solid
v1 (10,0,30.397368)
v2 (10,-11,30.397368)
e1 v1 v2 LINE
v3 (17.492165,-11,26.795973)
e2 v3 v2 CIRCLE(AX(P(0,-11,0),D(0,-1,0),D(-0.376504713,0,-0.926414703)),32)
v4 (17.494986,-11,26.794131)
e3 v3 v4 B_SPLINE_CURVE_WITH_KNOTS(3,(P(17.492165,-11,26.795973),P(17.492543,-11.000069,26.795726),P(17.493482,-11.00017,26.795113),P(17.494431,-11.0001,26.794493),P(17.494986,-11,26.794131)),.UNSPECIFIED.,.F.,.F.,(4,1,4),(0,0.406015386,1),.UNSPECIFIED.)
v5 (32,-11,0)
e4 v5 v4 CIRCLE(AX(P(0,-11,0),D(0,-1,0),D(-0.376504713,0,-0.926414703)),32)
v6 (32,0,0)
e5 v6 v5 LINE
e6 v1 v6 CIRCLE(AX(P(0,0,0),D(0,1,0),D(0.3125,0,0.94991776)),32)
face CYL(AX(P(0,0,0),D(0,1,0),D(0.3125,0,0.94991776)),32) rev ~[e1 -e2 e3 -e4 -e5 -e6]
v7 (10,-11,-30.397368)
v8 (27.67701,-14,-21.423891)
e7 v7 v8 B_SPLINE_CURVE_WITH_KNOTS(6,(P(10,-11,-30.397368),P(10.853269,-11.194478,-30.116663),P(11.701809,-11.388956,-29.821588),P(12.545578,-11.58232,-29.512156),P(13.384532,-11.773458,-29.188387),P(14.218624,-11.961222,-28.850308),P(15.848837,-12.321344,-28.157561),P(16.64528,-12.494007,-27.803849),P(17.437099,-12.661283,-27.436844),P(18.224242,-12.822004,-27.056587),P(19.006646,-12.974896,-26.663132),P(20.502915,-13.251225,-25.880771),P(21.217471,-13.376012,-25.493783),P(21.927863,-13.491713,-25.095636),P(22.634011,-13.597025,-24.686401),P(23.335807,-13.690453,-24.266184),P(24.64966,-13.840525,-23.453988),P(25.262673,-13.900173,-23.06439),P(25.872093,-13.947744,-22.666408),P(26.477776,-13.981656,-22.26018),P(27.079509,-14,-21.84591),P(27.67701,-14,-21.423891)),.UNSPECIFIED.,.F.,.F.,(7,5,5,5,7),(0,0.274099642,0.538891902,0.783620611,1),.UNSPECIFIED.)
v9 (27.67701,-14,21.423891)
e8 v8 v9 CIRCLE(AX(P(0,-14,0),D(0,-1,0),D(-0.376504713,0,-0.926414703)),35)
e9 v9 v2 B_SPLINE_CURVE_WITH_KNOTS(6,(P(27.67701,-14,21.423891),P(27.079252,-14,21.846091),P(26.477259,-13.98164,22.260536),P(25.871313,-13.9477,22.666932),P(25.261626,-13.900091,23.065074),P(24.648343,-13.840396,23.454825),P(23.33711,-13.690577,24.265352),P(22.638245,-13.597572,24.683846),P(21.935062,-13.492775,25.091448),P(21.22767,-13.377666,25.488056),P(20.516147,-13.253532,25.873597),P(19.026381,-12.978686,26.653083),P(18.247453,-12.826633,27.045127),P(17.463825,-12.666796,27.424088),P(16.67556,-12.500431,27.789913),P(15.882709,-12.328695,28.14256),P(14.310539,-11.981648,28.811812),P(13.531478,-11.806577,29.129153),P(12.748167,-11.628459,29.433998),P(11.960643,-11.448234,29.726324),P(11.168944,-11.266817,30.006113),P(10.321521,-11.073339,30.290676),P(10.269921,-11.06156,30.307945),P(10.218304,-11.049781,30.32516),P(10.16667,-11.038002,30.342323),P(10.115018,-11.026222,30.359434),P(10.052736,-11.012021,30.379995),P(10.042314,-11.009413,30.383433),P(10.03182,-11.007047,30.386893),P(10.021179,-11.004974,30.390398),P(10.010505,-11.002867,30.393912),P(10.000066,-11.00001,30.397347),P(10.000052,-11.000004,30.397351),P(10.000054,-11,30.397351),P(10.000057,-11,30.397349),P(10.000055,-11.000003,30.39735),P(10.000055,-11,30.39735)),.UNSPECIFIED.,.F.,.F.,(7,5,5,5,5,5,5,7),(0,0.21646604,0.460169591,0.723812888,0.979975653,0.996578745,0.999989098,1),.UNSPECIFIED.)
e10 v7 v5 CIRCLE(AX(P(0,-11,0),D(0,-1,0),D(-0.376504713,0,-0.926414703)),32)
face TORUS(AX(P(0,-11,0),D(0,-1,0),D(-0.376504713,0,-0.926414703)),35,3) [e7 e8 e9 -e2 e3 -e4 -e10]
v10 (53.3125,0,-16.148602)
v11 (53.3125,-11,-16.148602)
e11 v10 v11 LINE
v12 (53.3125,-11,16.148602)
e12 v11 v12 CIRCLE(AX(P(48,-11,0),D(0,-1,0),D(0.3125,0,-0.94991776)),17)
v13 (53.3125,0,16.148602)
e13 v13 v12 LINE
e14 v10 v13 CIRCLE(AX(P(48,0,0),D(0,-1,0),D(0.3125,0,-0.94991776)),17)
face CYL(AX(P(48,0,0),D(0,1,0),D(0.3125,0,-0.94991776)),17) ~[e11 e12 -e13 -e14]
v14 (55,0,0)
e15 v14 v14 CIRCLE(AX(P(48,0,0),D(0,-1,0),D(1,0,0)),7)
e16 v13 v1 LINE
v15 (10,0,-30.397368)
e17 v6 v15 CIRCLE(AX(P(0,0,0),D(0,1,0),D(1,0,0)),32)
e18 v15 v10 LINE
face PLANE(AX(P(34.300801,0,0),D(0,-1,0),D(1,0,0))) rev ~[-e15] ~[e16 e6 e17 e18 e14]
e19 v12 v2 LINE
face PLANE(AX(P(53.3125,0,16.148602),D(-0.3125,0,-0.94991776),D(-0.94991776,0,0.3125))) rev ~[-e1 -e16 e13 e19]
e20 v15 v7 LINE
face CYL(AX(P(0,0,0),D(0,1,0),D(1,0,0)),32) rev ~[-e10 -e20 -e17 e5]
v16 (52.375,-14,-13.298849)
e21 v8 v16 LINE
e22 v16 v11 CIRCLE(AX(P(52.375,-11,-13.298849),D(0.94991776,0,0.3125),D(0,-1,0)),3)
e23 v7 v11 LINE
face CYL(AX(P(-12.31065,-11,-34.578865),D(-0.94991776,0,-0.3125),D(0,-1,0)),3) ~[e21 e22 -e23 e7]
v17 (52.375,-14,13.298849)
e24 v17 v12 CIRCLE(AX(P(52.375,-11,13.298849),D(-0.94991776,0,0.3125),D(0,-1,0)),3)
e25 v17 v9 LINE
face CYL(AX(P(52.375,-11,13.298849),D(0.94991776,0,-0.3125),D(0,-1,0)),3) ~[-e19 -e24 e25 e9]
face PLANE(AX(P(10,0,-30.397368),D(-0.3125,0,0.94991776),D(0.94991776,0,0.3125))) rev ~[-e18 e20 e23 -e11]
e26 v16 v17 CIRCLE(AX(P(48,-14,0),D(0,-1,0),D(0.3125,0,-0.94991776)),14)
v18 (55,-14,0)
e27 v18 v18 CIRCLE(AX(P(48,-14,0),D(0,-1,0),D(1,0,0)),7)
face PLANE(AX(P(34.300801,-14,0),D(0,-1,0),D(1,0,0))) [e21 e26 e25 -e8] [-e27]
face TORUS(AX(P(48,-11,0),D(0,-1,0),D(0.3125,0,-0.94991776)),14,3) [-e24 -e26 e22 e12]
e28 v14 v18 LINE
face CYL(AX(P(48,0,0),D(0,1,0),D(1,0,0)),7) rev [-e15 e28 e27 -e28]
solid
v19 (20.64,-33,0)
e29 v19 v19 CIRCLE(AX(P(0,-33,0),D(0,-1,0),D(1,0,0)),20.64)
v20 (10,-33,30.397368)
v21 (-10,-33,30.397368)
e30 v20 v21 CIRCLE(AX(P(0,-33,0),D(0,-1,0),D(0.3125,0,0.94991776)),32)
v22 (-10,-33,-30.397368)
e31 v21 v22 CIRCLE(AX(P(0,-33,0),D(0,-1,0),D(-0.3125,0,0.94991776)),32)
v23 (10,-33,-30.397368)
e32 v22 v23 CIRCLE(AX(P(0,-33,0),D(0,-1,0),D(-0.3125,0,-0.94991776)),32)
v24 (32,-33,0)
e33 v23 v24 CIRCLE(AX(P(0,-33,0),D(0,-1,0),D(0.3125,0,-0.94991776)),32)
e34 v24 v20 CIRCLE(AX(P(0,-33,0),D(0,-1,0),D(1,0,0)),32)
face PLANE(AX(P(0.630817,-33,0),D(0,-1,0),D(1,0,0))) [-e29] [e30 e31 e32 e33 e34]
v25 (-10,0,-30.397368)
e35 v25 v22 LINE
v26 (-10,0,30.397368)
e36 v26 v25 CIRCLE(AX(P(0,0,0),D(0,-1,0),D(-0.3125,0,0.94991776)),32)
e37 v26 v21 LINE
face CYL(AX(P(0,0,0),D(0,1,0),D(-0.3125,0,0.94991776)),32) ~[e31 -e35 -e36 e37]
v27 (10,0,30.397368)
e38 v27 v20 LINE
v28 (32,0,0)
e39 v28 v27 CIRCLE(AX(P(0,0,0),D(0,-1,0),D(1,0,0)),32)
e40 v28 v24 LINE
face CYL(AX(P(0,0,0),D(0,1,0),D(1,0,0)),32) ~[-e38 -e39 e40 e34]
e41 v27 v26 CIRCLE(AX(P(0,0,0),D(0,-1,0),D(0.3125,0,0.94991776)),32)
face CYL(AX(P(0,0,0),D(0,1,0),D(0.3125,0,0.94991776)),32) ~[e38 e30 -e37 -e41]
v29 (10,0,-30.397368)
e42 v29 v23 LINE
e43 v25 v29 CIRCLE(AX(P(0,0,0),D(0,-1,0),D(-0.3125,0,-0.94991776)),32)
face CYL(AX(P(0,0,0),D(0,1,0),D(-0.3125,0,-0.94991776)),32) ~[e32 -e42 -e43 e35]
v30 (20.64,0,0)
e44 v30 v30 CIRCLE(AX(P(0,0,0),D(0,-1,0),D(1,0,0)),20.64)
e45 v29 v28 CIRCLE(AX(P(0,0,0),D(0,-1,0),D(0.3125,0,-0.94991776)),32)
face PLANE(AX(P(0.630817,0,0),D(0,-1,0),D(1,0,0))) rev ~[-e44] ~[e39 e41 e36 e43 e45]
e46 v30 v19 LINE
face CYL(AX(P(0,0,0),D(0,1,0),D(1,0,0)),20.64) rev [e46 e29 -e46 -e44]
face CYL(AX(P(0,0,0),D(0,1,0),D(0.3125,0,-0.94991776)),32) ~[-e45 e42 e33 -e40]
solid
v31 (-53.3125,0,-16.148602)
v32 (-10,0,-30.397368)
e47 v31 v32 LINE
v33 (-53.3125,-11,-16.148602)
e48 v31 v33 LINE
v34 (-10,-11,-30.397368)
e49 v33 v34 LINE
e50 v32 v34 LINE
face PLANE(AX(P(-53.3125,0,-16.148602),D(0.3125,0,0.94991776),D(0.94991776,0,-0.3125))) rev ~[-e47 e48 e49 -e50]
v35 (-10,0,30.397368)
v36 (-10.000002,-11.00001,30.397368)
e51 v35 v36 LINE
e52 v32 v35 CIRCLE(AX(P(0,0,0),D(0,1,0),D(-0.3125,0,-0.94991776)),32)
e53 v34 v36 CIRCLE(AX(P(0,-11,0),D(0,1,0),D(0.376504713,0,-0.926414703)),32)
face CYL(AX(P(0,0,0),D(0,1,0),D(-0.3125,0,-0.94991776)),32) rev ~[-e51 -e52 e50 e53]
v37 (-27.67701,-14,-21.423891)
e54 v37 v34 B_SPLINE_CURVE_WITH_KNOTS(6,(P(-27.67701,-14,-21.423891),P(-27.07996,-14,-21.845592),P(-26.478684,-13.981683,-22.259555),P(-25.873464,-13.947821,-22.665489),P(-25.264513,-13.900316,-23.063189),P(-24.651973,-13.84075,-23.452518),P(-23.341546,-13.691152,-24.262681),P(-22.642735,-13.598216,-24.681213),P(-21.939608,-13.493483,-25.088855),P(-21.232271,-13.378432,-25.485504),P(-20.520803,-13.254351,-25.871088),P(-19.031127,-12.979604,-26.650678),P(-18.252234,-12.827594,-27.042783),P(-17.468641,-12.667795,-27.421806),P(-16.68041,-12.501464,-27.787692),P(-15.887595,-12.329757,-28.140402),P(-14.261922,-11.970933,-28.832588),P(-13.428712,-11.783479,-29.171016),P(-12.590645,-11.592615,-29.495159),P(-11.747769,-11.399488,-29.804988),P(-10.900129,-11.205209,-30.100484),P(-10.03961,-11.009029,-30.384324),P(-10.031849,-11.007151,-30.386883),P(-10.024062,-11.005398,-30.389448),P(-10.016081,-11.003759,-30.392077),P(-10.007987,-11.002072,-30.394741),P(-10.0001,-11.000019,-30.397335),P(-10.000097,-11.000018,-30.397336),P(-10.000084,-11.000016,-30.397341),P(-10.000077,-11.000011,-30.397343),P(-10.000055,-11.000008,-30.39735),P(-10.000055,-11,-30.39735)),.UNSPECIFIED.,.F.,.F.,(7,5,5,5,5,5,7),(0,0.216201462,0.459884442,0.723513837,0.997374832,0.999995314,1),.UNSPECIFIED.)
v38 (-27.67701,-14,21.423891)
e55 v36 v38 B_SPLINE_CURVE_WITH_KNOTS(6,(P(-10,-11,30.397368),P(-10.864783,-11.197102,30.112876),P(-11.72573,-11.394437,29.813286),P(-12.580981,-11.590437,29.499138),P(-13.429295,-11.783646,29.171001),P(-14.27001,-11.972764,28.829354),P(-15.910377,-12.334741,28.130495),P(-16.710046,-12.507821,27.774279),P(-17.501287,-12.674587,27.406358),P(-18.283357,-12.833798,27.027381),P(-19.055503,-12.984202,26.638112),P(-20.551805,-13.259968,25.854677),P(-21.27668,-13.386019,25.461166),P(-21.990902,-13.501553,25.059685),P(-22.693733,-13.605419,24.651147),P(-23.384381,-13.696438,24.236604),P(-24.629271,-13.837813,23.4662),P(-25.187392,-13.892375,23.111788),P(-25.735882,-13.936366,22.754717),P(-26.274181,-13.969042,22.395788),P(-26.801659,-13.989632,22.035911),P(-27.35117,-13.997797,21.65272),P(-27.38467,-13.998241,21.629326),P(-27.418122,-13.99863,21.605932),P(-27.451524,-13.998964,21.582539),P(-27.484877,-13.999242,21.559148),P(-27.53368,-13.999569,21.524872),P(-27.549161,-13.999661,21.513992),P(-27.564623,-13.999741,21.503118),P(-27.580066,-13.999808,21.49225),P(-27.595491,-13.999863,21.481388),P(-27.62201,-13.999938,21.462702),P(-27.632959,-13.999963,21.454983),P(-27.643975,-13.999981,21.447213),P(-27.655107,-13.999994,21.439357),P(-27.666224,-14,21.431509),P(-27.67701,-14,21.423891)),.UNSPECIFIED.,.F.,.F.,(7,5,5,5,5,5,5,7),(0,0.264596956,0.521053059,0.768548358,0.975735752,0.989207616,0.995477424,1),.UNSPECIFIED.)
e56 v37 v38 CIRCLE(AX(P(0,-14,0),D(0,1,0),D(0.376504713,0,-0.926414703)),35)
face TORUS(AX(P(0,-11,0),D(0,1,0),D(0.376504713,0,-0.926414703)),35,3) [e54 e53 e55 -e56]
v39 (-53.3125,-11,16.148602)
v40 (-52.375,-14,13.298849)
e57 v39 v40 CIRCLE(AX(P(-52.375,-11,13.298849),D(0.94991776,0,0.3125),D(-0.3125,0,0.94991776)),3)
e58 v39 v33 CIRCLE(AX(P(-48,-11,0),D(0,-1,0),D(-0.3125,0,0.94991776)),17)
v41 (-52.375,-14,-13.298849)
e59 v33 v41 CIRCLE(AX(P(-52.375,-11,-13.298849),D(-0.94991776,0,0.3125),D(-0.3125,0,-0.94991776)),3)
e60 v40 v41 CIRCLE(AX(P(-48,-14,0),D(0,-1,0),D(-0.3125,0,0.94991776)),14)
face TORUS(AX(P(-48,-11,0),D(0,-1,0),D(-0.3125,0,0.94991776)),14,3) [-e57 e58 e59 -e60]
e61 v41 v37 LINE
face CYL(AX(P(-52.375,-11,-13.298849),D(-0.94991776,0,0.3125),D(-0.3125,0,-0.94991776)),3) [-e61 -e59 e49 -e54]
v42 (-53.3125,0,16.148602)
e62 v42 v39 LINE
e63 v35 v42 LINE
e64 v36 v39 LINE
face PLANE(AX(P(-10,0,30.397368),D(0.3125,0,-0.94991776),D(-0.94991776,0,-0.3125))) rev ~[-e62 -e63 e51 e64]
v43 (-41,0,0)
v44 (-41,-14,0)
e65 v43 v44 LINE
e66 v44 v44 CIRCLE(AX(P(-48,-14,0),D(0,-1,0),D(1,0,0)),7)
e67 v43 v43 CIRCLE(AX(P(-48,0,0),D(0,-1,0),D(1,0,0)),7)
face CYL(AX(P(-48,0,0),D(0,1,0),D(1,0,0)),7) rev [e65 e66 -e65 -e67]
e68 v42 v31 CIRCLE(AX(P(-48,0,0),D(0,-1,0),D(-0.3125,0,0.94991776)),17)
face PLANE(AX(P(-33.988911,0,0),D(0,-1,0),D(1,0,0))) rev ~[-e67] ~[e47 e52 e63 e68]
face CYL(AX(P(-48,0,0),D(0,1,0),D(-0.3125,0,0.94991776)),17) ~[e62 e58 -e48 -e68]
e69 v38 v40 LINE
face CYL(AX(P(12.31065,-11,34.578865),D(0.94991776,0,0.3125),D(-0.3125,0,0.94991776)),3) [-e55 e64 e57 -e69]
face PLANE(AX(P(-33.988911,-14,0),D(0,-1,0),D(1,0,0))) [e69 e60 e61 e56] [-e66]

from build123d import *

# Parameters (mm, degrees)
F0_R          = 7
F1_DEPTH      = 14
F0_R_2        = 20.64
F2_DEPTH      = 33
F3_T1_DEPTH   = 68.0960524607
F3_T3_DEPTH   = 68.0960524607
F3_T6_ANGLE   = 224.2346877327
F3_T8_ANGLE   = 143.5800862714
F3_2_T1_DEPTH = 68.0960524607
F3_2_T3_DEPTH = 68.0960524607
F3_2_T6_ANGLE = 224.2346877327
F3_2_T8_ANGLE = 143.5800862714


# Not quite as in the source:
# - a fillet or chamfer that OpenCascade refuses, or shapes differently, is made with other operations: its cross-section is extruded or revolved along the edge and cut away or added


with BuildPart() as f1:
    # F0 (on Front) → F1 (new body)
    with BuildSketch(Plane.XZ):
        with BuildLine():
            ThreePointArc((-10, -30.3973683071), (-32, 0), (-10, 30.3973683071))
            Line((-10, 30.3973683071), (-53.3125, 16.1486019132))
            ThreePointArc((-53.3125, 16.1486019132), (-65, 0), (-53.3125, -16.1486019132))
            Line((-53.3125, -16.1486019132), (-10, -30.3973683071))
        make_face()
        with Locations((-48, 0)):
            Circle(F0_R, mode=Mode.SUBTRACT)
    extrude(amount=F1_DEPTH)

    # F3: fillet of radius 3 on 4 edges, made by hand

    # F3_s2 → F3_t1 (cut)
    with BuildSketch(Plane(origin=(21.373149591, 0, 7.03125), x_dir=(0, 1, 0), z_dir=(-0.9499177596, 0, -0.3125))):
        with BuildLine():
            ThreePointArc((-11, -32), (-13.1213203436, -31.1213203436), (-14, -29))
            Line((-14, -29), (-14, -32))
            Line((-14, -32), (-11, -32))
        make_face()
    extrude(amount=F3_T1_DEPTH, mode=Mode.SUBTRACT)

    # F3_s4 → F3_t3 (cut)
    with BuildSketch(Plane(origin=(-43.3125, 0, 14.248766394), x_dir=(0, 1, 0), z_dir=(0.9499177596, 0, -0.3125))):
        with BuildLine():
            ThreePointArc((-11, -32), (-13.1213203436, -31.1213203436), (-14, -29))
            Line((-14, -29), (-14, -32))
            Line((-14, -32), (-11, -32))
        make_face()
    extrude(amount=F3_T3_DEPTH, mode=Mode.SUBTRACT)

    # F3_s5 → F3_t6 (revolve, cut)
    with BuildSketch(Plane(origin=(0, 0, 0), x_dir=(0, 1, 0), z_dir=(0.9264147025, 0, 0.3765047131))):
        with BuildLine():
            ThreePointArc((-11, -32), (-13.1213203436, -32.8786796564), (-14, -35))
            Line((-14, -35), (-14, -32))
            Line((-14, -32), (-11, -32))
        make_face()
    revolve(axis=Axis((0, -14, 0), (0, 1, 0)), revolution_arc=F3_T6_ANGLE, mode=Mode.SUBTRACT)

    # F3_s7 → F3_t8 (revolve, cut)
    with BuildSketch(Plane(origin=(-43.3125, 0, -14.248766394), x_dir=(0, 1, 0), z_dir=(0.9499177596, 0, 0.3125))):
        with BuildLine():
            ThreePointArc((-11, 32), (-13.1213203436, 31.1213203436), (-14, 29))
            Line((-14, 29), (-14, 32))
            Line((-14, 32), (-11, 32))
        make_face()
    revolve(axis=Axis((-48, -14, 0), (0, -1, 0)), revolution_arc=F3_T8_ANGLE, mode=Mode.SUBTRACT)


with BuildPart() as f1b:
    # F0 (on Front) → F1, piece 2 (new body)
    with BuildSketch(Plane.XZ):
        with BuildLine():
            ThreePointArc((10, 30.3973683071), (25.9229627936, 18.7616630393), (32, 0))
            ThreePointArc((32, 0), (25.9229627936, -18.7616630393), (10, -30.3973683071))
            Line((10, -30.3973683071), (53.3125, -16.1486019132))
            ThreePointArc((53.3125, -16.1486019132), (65, 0), (53.3125, 16.1486019132))
            Line((53.3125, 16.1486019132), (10, 30.3973683071))
        make_face()
        with Locations((48, 0)):
            Circle(F0_R, mode=Mode.SUBTRACT)
    extrude(amount=F1_DEPTH)

    # F3#2: fillet of radius 3 on 4 edges, made by hand

    # F3_2_s2 → F3_2_t1 (cut)
    with BuildSketch(Plane(origin=(43.3125, 0, -14.248766394), x_dir=(0, 1, 0), z_dir=(-0.9499177596, 0, 0.3125))):
        with BuildLine():
            ThreePointArc((-14, -29), (-13.1213203436, -31.1213203436), (-11, -32))
            Line((-11, -32), (-14, -32))
            Line((-14, -32), (-14, -29))
        make_face()
    extrude(amount=F3_2_T1_DEPTH, mode=Mode.SUBTRACT)

    # F3_2_s4 → F3_2_t3 (cut)
    with BuildSketch(Plane(origin=(-21.373149591, 0, -7.03125), x_dir=(0, 1, 0), z_dir=(0.9499177596, 0, 0.3125))):
        with BuildLine():
            ThreePointArc((-14, -29), (-13.1213203436, -31.1213203436), (-11, -32))
            Line((-11, -32), (-14, -32))
            Line((-14, -32), (-14, -29))
        make_face()
    extrude(amount=F3_2_T3_DEPTH, mode=Mode.SUBTRACT)

    # F3_2_s5 → F3_2_t6 (revolve, cut)
    with BuildSketch(Plane(origin=(0, 0, 0), x_dir=(0, 1, 0), z_dir=(-0.9264147025, 0, 0.3765047131))):
        with BuildLine():
            ThreePointArc((-14, 35), (-13.1213203436, 32.8786796564), (-11, 32))
            Line((-11, 32), (-14, 32))
            Line((-14, 32), (-14, 35))
        make_face()
    revolve(axis=Axis((0, -14, 0), (0, -1, 0)), revolution_arc=F3_2_T6_ANGLE, mode=Mode.SUBTRACT)

    # F3_2_s7 → F3_2_t8 (revolve, cut)
    with BuildSketch(Plane(origin=(43.3125, 0, 14.248766394), x_dir=(0, 1, 0), z_dir=(-0.9499177596, 0, -0.3125))):
        with BuildLine():
            ThreePointArc((-11, 32), (-13.1213203436, 31.1213203436), (-14, 29))
            Line((-14, 29), (-14, 32))
            Line((-14, 32), (-11, 32))
        make_face()
    revolve(axis=Axis((48, -14, 0), (0, -1, 0)), revolution_arc=F3_2_T8_ANGLE, mode=Mode.SUBTRACT)


with BuildPart() as f2:
    # F0 (on Front) → F2 (new body)
    with BuildSketch(Plane.XZ):
        with BuildLine():
            ThreePointArc((10, -30.3973683071), (25.9229627936, -18.7616630393), (32, 0))
            ThreePointArc((32, 0), (25.9229627936, 18.7616630393), (10, 30.3973683071))
            ThreePointArc((10, 30.3973683071), (0, 32), (-10, 30.3973683071))
            ThreePointArc((-10, 30.3973683071), (-32, 0), (-10, -30.3973683071))
            ThreePointArc((-10, -30.3973683071), (0, -32), (10, -30.3973683071))
        make_face()
        Circle(F0_R_2, mode=Mode.SUBTRACT)
    extrude(amount=F2_DEPTH)


solid = Compound([f1.part, f1b.part, f2.part])
